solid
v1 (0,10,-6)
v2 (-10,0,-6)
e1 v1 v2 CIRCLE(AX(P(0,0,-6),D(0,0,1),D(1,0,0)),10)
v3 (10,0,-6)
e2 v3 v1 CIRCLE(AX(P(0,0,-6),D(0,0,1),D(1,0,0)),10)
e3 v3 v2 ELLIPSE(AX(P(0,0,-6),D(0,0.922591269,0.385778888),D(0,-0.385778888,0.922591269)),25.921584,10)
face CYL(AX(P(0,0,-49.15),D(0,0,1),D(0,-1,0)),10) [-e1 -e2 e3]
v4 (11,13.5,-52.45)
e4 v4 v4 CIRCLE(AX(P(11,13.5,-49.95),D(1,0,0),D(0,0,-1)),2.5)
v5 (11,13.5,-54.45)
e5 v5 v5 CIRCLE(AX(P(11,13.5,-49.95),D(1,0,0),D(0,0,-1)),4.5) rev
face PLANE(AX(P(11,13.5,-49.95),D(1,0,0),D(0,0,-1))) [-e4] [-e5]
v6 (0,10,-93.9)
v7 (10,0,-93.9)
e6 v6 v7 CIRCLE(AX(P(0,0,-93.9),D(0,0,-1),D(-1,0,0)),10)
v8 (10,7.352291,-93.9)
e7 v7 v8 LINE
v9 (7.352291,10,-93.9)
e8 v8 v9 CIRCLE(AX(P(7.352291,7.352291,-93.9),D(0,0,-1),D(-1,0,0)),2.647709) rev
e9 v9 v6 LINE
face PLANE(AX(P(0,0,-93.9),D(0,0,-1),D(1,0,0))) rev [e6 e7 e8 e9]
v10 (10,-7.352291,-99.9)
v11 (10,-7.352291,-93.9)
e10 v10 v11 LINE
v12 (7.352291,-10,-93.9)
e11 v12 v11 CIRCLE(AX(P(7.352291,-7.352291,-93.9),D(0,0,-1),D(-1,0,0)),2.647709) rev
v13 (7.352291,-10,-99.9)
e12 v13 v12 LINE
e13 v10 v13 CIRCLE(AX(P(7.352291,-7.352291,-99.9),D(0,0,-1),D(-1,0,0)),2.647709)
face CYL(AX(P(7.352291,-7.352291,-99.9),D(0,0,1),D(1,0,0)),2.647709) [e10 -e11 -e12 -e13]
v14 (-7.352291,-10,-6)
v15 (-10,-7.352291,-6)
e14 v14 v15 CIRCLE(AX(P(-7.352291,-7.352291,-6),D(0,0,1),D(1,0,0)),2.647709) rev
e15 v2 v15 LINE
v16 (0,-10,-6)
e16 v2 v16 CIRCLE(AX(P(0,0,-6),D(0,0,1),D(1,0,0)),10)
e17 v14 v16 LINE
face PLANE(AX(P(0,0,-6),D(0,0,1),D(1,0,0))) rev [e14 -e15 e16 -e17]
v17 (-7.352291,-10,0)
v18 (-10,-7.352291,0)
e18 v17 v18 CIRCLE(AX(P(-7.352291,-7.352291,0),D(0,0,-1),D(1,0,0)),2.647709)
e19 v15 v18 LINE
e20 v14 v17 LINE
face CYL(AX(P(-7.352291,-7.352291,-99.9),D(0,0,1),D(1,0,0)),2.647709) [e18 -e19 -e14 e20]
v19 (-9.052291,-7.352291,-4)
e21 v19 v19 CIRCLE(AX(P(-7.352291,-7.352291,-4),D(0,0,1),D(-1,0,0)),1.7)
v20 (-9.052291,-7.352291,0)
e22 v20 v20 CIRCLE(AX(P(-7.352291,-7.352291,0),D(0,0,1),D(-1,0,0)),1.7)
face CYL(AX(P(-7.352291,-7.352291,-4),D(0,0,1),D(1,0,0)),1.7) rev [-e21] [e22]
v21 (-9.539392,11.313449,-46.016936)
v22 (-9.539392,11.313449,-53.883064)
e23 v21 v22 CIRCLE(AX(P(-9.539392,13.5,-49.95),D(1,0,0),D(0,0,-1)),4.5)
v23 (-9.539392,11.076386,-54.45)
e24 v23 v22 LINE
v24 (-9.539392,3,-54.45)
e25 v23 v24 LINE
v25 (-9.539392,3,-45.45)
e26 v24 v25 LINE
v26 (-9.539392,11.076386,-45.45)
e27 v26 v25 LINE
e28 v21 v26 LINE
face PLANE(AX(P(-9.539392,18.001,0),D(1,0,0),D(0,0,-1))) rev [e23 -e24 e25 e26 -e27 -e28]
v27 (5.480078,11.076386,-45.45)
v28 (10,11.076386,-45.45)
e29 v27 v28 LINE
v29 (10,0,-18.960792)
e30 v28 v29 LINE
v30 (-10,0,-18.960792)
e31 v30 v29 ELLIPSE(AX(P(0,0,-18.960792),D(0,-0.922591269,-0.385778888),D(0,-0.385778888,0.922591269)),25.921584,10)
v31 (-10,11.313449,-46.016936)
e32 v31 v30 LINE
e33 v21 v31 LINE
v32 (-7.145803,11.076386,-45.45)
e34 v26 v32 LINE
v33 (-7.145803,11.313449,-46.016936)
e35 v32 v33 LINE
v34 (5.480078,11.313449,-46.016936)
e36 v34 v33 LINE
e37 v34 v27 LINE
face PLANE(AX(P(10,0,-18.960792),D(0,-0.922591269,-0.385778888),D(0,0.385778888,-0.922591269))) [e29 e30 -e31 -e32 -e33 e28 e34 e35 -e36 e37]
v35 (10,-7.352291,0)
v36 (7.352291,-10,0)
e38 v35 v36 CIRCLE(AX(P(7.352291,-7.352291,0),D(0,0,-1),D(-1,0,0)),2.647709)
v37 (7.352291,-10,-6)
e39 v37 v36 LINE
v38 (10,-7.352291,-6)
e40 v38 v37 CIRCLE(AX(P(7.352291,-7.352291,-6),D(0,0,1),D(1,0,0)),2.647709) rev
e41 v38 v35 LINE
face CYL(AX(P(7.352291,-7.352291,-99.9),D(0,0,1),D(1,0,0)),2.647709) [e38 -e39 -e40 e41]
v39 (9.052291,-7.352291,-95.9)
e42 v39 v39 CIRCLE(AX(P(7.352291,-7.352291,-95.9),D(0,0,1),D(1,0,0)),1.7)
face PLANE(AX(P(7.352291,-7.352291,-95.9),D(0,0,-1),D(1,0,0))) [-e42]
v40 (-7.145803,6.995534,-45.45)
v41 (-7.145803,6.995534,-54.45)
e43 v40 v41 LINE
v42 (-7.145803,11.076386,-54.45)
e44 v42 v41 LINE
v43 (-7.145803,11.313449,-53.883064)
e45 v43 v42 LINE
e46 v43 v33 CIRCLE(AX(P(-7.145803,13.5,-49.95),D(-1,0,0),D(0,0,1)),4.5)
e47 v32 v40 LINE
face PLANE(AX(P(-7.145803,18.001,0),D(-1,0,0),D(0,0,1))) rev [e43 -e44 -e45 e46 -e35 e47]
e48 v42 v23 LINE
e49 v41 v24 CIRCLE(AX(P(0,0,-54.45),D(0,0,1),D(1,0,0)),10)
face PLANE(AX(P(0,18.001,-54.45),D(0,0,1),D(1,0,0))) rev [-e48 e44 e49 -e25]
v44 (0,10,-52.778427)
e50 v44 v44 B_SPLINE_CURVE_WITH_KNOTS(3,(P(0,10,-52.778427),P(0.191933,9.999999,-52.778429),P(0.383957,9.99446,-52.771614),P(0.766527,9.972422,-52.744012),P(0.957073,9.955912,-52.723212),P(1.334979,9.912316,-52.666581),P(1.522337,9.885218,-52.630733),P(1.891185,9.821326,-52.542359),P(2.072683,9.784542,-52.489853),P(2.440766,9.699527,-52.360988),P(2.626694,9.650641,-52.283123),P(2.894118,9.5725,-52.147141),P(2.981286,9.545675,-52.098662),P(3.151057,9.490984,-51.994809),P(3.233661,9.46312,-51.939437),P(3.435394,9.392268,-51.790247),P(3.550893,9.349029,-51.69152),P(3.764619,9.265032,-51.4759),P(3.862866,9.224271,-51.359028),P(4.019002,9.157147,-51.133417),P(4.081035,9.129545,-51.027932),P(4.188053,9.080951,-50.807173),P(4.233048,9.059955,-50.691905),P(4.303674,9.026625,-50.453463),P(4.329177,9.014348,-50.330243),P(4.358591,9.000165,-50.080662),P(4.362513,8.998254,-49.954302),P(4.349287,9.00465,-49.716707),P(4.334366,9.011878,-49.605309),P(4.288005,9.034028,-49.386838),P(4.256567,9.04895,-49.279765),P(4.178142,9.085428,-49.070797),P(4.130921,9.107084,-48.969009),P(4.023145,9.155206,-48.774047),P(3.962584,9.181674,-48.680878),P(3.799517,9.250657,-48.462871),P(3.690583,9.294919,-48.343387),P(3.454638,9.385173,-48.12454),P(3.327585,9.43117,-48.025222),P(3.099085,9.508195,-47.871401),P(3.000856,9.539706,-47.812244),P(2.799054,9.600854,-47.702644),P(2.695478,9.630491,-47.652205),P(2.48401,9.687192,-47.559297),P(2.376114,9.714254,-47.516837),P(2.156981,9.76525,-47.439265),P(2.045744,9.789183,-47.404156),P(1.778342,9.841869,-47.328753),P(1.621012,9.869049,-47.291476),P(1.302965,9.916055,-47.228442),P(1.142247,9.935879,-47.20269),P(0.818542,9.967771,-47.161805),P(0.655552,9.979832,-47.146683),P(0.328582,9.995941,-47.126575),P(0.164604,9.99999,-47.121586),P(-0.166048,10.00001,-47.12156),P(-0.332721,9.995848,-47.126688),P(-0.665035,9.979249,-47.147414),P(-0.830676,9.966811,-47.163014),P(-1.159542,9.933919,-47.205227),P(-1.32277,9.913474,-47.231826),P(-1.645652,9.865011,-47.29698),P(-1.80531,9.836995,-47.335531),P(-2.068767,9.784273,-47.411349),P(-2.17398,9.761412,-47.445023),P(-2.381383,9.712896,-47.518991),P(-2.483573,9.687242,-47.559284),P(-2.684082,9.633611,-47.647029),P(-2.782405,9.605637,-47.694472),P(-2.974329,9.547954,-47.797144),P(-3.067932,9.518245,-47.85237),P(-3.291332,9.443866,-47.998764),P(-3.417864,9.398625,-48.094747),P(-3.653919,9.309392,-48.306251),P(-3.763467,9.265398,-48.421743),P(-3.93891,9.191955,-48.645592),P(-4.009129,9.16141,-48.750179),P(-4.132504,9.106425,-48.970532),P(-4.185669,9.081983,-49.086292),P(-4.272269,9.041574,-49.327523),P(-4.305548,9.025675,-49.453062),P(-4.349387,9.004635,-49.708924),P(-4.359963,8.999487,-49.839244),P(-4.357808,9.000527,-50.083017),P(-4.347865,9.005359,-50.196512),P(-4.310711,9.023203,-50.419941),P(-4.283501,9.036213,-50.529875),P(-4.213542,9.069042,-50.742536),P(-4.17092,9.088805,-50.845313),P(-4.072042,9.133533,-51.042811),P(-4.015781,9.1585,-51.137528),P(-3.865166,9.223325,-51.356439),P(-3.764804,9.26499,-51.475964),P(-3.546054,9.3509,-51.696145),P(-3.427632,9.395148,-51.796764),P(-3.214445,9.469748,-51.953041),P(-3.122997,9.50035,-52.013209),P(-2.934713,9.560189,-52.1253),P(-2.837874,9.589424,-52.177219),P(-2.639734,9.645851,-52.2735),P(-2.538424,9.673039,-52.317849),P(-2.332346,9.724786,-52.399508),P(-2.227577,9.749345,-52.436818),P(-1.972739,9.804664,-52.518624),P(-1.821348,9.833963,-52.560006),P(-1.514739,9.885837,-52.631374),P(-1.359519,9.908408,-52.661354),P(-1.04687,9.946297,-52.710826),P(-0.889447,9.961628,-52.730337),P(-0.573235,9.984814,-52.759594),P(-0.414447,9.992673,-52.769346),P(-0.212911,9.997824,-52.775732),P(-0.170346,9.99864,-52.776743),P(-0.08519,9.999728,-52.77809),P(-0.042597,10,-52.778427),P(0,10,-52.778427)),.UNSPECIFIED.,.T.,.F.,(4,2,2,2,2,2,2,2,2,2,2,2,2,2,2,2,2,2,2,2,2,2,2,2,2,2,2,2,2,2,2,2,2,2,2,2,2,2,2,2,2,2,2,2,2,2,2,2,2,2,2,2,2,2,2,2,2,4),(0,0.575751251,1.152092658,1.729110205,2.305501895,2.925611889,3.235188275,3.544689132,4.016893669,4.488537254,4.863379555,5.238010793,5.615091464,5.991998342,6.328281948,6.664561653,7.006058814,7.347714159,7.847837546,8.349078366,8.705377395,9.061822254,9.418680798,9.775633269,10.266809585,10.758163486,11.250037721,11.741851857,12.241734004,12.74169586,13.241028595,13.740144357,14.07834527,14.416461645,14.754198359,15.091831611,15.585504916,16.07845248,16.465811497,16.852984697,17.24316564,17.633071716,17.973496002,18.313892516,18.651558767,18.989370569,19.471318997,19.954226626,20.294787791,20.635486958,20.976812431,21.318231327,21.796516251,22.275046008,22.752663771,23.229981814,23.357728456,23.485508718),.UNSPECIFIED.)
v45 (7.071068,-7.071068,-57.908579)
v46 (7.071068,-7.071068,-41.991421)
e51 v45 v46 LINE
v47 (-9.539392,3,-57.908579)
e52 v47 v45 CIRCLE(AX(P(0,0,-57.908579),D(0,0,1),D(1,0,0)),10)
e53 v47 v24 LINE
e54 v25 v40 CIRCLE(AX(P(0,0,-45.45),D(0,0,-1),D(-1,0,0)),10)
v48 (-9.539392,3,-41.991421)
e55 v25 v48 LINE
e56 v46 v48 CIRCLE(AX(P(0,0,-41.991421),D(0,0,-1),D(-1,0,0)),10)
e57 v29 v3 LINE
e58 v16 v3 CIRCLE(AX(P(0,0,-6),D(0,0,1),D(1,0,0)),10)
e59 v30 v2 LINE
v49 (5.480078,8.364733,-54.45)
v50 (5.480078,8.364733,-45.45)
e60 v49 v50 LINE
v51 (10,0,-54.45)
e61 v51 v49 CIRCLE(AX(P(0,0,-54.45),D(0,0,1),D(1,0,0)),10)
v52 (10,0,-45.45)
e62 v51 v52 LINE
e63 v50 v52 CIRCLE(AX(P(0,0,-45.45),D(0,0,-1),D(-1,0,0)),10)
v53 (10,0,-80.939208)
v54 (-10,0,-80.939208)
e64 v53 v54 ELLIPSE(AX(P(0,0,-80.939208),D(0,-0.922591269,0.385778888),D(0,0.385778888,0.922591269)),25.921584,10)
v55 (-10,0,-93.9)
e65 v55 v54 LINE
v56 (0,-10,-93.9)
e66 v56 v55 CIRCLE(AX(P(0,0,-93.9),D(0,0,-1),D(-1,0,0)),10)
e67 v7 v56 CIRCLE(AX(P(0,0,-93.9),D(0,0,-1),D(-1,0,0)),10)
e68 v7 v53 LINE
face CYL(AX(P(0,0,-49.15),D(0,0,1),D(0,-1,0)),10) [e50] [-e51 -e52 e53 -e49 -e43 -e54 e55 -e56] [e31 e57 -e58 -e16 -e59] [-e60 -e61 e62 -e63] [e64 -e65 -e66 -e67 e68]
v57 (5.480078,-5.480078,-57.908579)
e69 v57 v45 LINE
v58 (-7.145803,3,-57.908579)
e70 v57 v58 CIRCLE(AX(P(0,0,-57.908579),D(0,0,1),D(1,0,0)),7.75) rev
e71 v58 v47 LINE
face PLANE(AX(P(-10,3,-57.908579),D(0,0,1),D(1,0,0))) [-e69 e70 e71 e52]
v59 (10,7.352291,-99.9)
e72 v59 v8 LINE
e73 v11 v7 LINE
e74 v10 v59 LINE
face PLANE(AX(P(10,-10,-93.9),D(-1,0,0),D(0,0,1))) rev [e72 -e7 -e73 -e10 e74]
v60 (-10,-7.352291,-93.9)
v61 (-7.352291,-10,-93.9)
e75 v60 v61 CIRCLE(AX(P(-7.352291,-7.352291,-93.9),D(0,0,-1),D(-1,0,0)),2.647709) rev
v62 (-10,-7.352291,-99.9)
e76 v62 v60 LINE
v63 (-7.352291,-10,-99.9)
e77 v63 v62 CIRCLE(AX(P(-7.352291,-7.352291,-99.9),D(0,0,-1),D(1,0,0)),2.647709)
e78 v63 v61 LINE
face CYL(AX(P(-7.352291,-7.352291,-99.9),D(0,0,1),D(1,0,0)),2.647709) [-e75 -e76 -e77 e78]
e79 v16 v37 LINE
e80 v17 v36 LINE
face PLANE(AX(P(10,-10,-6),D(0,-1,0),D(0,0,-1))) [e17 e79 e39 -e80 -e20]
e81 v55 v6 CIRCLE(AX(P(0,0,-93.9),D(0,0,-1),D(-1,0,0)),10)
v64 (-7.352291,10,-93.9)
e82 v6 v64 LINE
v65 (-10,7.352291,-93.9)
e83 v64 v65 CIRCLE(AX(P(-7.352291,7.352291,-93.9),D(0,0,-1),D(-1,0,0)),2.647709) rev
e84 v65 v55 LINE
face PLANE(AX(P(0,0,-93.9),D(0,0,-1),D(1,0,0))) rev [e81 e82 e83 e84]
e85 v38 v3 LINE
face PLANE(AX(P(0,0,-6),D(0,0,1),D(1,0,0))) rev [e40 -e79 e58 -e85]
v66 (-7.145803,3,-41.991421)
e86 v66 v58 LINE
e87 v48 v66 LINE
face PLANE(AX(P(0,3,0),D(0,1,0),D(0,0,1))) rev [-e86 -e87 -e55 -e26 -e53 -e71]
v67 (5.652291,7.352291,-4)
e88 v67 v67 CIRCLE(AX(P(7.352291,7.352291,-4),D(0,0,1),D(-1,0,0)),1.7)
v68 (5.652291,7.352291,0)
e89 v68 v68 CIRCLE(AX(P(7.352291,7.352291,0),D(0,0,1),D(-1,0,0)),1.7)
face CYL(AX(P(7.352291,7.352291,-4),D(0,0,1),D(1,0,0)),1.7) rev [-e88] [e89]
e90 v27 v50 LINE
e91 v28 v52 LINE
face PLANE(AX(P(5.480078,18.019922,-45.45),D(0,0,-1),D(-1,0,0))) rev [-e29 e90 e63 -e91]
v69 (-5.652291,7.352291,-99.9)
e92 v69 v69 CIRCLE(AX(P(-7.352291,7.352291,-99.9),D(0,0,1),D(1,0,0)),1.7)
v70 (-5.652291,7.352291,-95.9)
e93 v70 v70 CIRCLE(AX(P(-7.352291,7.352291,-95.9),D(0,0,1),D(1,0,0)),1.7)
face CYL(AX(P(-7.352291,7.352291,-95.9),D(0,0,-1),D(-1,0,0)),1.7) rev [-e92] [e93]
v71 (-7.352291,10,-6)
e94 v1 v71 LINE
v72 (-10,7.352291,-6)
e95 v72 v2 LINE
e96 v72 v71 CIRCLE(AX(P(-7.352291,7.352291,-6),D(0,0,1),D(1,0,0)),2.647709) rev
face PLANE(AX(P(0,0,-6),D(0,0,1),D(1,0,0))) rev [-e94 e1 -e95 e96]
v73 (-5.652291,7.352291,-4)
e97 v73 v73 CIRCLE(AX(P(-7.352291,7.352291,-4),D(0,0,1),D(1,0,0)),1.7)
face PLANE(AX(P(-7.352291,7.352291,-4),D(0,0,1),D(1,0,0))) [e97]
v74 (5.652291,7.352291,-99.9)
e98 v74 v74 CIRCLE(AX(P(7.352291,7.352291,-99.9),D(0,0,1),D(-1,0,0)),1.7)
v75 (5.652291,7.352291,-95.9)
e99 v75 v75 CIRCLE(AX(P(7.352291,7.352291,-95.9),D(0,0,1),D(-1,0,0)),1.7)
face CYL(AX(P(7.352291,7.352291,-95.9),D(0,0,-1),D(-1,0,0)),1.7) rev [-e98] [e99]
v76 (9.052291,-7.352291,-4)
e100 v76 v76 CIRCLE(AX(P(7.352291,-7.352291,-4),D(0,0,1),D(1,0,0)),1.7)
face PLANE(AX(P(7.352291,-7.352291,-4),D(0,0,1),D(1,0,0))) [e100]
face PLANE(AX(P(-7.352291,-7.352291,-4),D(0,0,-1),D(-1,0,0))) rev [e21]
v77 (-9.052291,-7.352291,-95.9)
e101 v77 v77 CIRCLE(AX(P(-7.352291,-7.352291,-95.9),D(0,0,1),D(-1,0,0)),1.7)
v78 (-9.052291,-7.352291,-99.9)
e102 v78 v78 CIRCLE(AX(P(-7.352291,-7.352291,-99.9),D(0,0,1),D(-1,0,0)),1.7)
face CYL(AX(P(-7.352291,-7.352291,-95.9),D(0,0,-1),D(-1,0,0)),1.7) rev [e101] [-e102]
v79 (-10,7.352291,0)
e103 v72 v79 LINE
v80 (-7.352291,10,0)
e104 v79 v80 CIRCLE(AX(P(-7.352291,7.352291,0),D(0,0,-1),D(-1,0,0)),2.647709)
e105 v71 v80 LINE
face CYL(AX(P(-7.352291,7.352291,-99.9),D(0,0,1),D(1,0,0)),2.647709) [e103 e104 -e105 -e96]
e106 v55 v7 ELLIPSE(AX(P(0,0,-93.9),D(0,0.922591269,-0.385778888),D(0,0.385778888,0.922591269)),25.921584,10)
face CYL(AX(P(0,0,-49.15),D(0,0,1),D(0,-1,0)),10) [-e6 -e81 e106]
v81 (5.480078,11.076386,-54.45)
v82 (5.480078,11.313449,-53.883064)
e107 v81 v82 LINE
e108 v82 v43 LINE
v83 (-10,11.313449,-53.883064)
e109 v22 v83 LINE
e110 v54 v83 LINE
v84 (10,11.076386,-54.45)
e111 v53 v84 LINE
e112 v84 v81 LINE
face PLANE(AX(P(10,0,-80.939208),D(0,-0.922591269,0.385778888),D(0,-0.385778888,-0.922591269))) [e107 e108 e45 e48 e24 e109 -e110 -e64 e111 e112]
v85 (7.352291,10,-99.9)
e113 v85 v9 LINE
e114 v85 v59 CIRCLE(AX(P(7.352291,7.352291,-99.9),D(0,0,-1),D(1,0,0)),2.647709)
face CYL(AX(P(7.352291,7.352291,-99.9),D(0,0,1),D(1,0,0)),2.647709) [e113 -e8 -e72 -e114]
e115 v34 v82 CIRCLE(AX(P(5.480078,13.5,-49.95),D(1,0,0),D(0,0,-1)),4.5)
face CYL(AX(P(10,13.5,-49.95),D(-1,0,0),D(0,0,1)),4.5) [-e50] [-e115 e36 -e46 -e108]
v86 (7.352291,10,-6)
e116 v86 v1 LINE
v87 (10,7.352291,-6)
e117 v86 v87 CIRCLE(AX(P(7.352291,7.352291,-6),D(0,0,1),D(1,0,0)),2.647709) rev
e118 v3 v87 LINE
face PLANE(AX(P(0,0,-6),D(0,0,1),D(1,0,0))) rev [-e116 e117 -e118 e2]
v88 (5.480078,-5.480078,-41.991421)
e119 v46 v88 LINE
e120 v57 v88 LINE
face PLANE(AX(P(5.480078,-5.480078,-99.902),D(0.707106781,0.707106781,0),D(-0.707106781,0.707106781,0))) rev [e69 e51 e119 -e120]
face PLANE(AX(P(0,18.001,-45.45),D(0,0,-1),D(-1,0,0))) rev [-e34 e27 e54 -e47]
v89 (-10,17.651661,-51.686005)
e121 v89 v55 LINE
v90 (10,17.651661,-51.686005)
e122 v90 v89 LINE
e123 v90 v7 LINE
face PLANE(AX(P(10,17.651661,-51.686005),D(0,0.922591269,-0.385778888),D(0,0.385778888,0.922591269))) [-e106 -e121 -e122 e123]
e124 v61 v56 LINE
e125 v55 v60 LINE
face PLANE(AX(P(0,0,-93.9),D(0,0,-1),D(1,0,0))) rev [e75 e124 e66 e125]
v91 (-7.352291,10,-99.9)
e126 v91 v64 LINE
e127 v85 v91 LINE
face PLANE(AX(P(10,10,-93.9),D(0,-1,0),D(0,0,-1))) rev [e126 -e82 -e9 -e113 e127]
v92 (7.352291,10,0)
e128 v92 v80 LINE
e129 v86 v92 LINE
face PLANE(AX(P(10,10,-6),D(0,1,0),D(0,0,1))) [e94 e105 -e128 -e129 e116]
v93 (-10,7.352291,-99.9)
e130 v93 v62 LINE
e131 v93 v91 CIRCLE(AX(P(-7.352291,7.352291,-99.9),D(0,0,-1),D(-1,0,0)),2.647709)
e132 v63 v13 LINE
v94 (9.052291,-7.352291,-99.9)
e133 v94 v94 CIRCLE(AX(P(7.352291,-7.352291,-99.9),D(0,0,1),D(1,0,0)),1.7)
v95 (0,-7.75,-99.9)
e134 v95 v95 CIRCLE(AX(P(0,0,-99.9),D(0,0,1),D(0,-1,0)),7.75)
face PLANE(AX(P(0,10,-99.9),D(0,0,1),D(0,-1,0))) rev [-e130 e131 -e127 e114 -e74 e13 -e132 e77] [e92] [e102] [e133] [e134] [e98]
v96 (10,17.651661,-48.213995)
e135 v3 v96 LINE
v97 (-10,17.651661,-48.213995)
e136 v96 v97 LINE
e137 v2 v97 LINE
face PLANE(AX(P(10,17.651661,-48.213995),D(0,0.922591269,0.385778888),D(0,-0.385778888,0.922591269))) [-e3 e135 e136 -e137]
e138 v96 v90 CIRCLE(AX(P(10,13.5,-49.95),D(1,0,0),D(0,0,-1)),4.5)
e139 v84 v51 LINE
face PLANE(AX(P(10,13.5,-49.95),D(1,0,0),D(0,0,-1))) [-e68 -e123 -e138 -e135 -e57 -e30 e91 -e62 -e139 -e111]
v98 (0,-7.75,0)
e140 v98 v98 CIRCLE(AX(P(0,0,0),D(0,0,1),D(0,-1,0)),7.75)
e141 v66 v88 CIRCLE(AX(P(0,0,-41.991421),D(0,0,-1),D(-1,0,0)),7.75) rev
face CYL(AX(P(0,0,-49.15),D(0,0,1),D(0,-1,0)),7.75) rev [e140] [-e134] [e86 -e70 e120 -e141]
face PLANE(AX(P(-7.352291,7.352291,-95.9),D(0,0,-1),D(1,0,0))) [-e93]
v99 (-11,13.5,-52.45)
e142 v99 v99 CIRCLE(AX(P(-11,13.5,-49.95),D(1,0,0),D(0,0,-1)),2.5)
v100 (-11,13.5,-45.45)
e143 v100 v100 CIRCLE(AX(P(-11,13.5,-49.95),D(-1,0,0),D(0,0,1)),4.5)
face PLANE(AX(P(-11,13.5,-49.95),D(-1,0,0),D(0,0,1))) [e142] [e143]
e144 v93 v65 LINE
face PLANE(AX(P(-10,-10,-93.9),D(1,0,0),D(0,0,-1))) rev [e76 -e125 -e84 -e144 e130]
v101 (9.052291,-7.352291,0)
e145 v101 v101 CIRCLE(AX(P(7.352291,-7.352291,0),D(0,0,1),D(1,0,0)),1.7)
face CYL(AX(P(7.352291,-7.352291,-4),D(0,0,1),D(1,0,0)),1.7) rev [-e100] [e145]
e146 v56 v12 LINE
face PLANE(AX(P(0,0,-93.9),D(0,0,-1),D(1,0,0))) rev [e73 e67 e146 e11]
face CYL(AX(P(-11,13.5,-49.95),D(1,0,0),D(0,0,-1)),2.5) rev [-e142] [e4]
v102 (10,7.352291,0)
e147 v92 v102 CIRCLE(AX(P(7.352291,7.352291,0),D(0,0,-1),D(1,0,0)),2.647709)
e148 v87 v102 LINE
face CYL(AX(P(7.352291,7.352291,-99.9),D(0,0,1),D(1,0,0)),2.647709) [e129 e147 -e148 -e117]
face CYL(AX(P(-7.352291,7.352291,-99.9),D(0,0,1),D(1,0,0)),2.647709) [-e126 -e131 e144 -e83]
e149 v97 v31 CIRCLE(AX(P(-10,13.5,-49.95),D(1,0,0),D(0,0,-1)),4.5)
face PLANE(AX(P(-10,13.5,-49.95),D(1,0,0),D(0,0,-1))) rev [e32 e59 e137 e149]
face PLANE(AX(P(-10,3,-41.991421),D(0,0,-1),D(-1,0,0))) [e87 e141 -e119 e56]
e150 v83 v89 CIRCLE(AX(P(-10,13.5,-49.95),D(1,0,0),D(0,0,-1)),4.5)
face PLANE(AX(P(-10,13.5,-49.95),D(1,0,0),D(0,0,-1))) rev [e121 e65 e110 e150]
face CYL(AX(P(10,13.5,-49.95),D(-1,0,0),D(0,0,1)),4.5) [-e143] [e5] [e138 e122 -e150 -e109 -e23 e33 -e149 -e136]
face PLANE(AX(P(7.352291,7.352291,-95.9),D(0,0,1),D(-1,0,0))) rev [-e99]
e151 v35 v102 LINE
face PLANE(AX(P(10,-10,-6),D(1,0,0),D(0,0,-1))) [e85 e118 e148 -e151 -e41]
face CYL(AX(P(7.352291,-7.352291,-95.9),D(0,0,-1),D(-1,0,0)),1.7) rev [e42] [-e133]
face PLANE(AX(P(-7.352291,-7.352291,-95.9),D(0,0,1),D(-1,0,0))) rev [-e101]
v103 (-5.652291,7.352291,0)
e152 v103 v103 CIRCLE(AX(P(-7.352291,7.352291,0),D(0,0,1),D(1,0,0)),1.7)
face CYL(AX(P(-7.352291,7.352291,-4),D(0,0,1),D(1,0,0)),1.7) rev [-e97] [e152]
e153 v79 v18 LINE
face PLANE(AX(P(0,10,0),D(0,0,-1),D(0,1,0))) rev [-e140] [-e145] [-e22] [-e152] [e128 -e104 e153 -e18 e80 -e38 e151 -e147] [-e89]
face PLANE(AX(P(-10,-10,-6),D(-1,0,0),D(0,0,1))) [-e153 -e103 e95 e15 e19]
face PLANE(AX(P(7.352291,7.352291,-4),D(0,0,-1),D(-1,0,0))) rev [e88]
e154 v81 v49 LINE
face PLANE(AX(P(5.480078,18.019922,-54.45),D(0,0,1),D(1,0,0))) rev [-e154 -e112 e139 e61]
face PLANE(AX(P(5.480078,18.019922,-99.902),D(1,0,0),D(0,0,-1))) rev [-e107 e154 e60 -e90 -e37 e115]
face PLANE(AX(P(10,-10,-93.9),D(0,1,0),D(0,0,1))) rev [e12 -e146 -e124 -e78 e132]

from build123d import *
from build123d.topology import SkipClean

# Parameters (mm, degrees)
SKIZZE2_W                            = 99.9
SKIZZE2_H                            = 2.25
SKIZZE3_W                            = 20
SKIZZE3_H                            = 20
SKIZZE3_R                            = 7.75
AUFSATZ_LINEAR_AUSTRAGEN1_DEPTH      = 6
SKIZZE5_R                            = 1.7
SCHNITT_LINEAR_AUSTRAGEN1_DEPTH      = 4
SCHNITT_LINEAR_AUSTRAGEN2_DEPTH      = 101.896035601
SCHNITT_LINEAR_AUSTRAGEN4_DEPTH      = 3
SCHNITT_LINEAR_AUSTRAGEN4_DEPTH_BACK = 101.896035601
SKIZZE8_W                            = 20
SKIZZE8_H                            = 15.917157288
AUFSATZ_LINEAR_AUSTRAGEN2_REACH      = 61.61
AUFSATZ_LINEAR_AUSTRAGEN11_DEPTH     = 20
SKIZZE20_R                           = 7.75
SCHNITT_LINEAR_AUSTRAGEN7_DEPTH      = 103.000049029
AUFSATZ_LINEAR_START                 = -21
SKIZZE21_R                           = 4.5
AUFSATZ_LINEAR_AUSTRAGEN12_DEPTH     = 22
SKIZZE22_R                           = 2.5
SCHNITT_LINEAR_AUSTRAGEN8_DEPTH      = 104.86534552
AUFSATZ_LINEAR_START_2               = -9.539392014
AUFSATZ_LINEAR_AUSTRAGEN14_DEPTH     = 2.39358905
AUFSATZ_LINEAR_START_3               = -20.918031139
AUFSATZ_LINEAR_AUSTRAGEN15_OUTLINE_W = 4.519922446
AUFSATZ_LINEAR_AUSTRAGEN15_OUTLINE_H = 9
AUFSATZ_LINEAR_AUSTRAGEN15_DEPTH     = 16.398108693
AUFSATZ_LINEAR_START_4               = 5.480077554
AUFSATZ_LINEAR_AUSTRAGEN15_2_DEPTH   = 4.519922446
AUFSATZ_LINEAR_START_5               = -54.45
AUFSATZ_LINEAR_AUSTRAGEN15_3_DEPTH   = 9
SKIZZE26_R                           = 7.75
SCHNITT_LINEAR_AUSTRAGEN9_DEPTH      = 9


with BuildPart() as part:
    # Skizze2 → Rotation1 (revolve)
    with BuildSketch(Plane(origin=(0, 0, 0), x_dir=(0, 0, -1), z_dir=(1, 0, 0)), mode=Mode.PRIVATE) as rotation1_sk:
        with Locations((49.95, 8.875)):
            Rectangle(SKIZZE2_W, SKIZZE2_H)
    revolve(rotation1_sk.sketch.rotate(Axis((0, 0, -49.15), (0, 0, -1)), 180), axis=Axis((0, 0, -49.15), (0, 0, -1)))

    # Skizze3 → Aufsatz-Linear austragen1 (add)
    with BuildSketch(Plane.XY):
        Rectangle(SKIZZE3_W, SKIZZE3_H)
        with Locations(Location((0, 0, 0), (0, 0, 270))):
            Circle(SKIZZE3_R, mode=Mode.SUBTRACT)
    aufsatz_linear_austragen1 = extrude(amount=-AUFSATZ_LINEAR_AUSTRAGEN1_DEPTH)

    # Skizze5 → Schnitt-Linear austragen1 (cut)
    with BuildSketch(Plane.XY):
        with Locations((-7.352290732, 7.352290732)):
            Circle(SKIZZE5_R)
        with Locations(Location((-7.352290732, -7.352290732, 0), (0, 0, 180))):
            Circle(SKIZZE5_R)
        with Locations((7.352290732, -7.352290732)):
            Circle(SKIZZE5_R)
        with Locations(Location((7.352290732, 7.352290732, 0), (0, 0, 180))):
            Circle(SKIZZE5_R)
    schnitt_linear_austragen1 = extrude(amount=-SCHNITT_LINEAR_AUSTRAGEN1_DEPTH, mode=Mode.SUBTRACT)

    # Spiegeln1: Aufsatz-Linear austragen1, Schnitt-Linear austragen1 across plane
    add(aufsatz_linear_austragen1.mirror(Plane.XY.offset(-49.95)))
    add(schnitt_linear_austragen1.mirror(Plane.XY.offset(-49.95)), mode=Mode.SUBTRACT)

    # Skizze6 → Schnitt-Linear austragen2 (cut, through all)
    with BuildSketch(Plane.XY):
        with BuildLine():
            Line((-10, 7.352290732), (-10.707106781, 7.352290732))
            Line((-10.707106781, 7.352290732), (-10.707106781, 10.707106781))
            Line((-10.707106781, 10.707106781), (-7.352290732, 10.707106781))
            Line((-7.352290732, 10.707106781), (-7.352290732, 10))
            ThreePointArc((-7.352290732, 10), (-9.22450391, 9.22450391), (-10, 7.352290732))
        make_face()
        with BuildLine():
            Line((7.352290732, 10.707106781), (7.352290732, 10))
            ThreePointArc((7.352290732, 10), (9.22450391, 9.22450391), (10, 7.352290732))
            Line((10, 7.352290732), (10.707106781, 7.352290732))
            Line((10.707106781, 7.352290732), (10.707106781, 10.707106781))
            Line((10.707106781, 10.707106781), (7.352290732, 10.707106781))
        make_face()
        with BuildLine():
            Line((10, -7.352290732), (10.707106781, -7.352290732))
            Line((10.707106781, -7.352290732), (10.707106781, -10.707106781))
            Line((10.707106781, -10.707106781), (7.352290732, -10.707106781))
            Line((7.352290732, -10.707106781), (7.352290732, -10))
            ThreePointArc((7.352290732, -10), (9.22450391, -9.22450391), (10, -7.352290732))
        make_face()
        with BuildLine():
            Line((-7.352290732, -10.707106781), (-7.352290732, -10))
            ThreePointArc((-7.352290732, -10), (-9.22450391, -9.22450391), (-10, -7.352290732))
            Line((-10, -7.352290732), (-10.707106781, -7.352290732))
            Line((-10.707106781, -7.352290732), (-10.707106781, -10.707106781))
            Line((-10.707106781, -10.707106781), (-7.352290732, -10.707106781))
        make_face()
    extrude(amount=-SCHNITT_LINEAR_AUSTRAGEN2_DEPTH, mode=Mode.SUBTRACT)

    # Skizze8 → Schnitt-Linear austragen4 (cut, two sides: drawn at the far end of the back side and taken through both)
    with BuildSketch(Plane(origin=(0, 0, 0), x_dir=(1, 0, 0), z_dir=(0, 1, 0)).offset(-SCHNITT_LINEAR_AUSTRAGEN4_DEPTH_BACK)):
        with Locations((0, 49.95)):
            Rectangle(SKIZZE8_W, SKIZZE8_H)
    extrude(amount=SCHNITT_LINEAR_AUSTRAGEN4_DEPTH + SCHNITT_LINEAR_AUSTRAGEN4_DEPTH_BACK, mode=Mode.SUBTRACT)

    # Skizze9 → Aufsatz-Linear austragen2 (add, up to next)
    with BuildSketch(Plane(origin=(0, 0, -41.991421356), x_dir=(-1, 0, 0), z_dir=(0, 0, -1)), mode=Mode.PRIVATE) as aufsatz_linear_austragen2_sk1:
        with BuildLine():
            Line((-9.539392014, 3), (-7.145802964, 3))
            ThreePointArc((-7.145802964, 3), (-7.604679056, -1.493772558), (-5.480077554, -5.480077554))
            Line((-5.480077554, -5.480077554), (-7.071067812, -7.071067812))
            ThreePointArc((-7.071067812, -7.071067812), (-9.712540637, -2.380452557), (-9.539392014, 3))
        make_face()
    aufsatz_linear_austragen2_tool1 = extrude(aufsatz_linear_austragen2_sk1.sketch, amount=AUFSATZ_LINEAR_AUSTRAGEN2_REACH, mode=Mode.PRIVATE) - part.part
    add(aufsatz_linear_austragen2_tool1.solids().sort_by_distance((8.235697, -1.849559, -41.991421))[0])

    # Skizze19 → Aufsatz-Linear austragen11 (add, through all)
    with BuildSketch(Plane.ZY.offset(10)):
        with BuildLine():
            Line((-51.686004996, 17.65166071), (-93.9, 0))
            Line((-93.9, 0), (-80.939207809, 0))
            Line((-80.939207809, 0), (-53.883064142, 11.31344873))
            ThreePointArc((-53.883064142, 11.31344873), (-49.95, 9), (-46.016935858, 11.31344873))
            Line((-46.016935858, 11.31344873), (-18.960792191, 0))
            Line((-18.960792191, 0), (-6, 0))
            Line((-6, 0), (-48.213995004, 17.65166071))
            ThreePointArc((-48.213995004, 17.65166071), (-49.95, 18), (-51.686004996, 17.65166071))
        make_face()
    extrude(amount=-AUFSATZ_LINEAR_AUSTRAGEN11_DEPTH)

    # Skizze20 → Schnitt-Linear austragen7 (cut, through all)
    with SkipClean():  # the faces are left unmerged after this step: merging them gives an invalid solid
        with BuildSketch(Plane(origin=(0, 0, -99.9), x_dir=(-1, 0, 0), z_dir=(0, 0, -1))):
            with Locations(Location((0, 0, 0), (0, 0, 270))):
                Circle(SKIZZE20_R)
        extrude(amount=-SCHNITT_LINEAR_AUSTRAGEN7_DEPTH, mode=Mode.SUBTRACT)

    # Skizze21 → Aufsatz-Linear austragen12 (add)
    with SkipClean():  # the faces are left unmerged after this step: merging them gives an invalid solid
        with BuildSketch(Plane.ZY.offset(10).offset(AUFSATZ_LINEAR_START)):
            with Locations((-49.95, 13.5)):
                Circle(SKIZZE21_R)
        extrude(amount=AUFSATZ_LINEAR_AUSTRAGEN12_DEPTH)

    # Skizze22 → Schnitt-Linear austragen8 (cut, through all)
    with SkipClean():  # the faces are left unmerged after this step: merging them gives an invalid solid
        with BuildSketch(Plane(origin=(11, 0, 0), x_dir=(0, 0, -1), z_dir=(1, 0, 0))):
            with Locations((49.95, 13.5)):
                Circle(SKIZZE22_R)
        extrude(amount=-SCHNITT_LINEAR_AUSTRAGEN8_DEPTH, mode=Mode.SUBTRACT)

    # Aufsatz-Linear austragen14: read off the stored shape, not the designer's step
    # Aufsatz-Linear austragen14 outline → Aufsatz-Linear austragen14 (add)
    with SkipClean():  # the faces are left unmerged after this step: merging them gives an invalid solid
        with BuildSketch(Plane.YZ.offset(AUFSATZ_LINEAR_START_2)):
            with BuildLine():
                Line((11.31344873, -46.016935858), (11.076386129, -45.45))
                Line((11.076386129, -45.45), (3, -45.45))
                Line((3, -45.45), (3, -54.45))
                Line((3, -54.45), (11.076386129, -54.45))
                Line((11.076386129, -54.45), (11.31344873, -53.883064142))
                ThreePointArc((11.31344873, -53.883064142), (9, -49.95), (11.31344873, -46.016935858))
            make_face()
        extrude(amount=AUFSATZ_LINEAR_AUSTRAGEN14_DEPTH)

    # Aufsatz-Linear austragen15: read off the stored shape, not the designer's step
    # Aufsatz-Linear austragen15 outline → Aufsatz-Linear austragen15 (add)
    with SkipClean():  # the faces are left unmerged after this step: merging them gives an invalid solid
        with BuildSketch(Plane(origin=(0, -10, 0), x_dir=(-1, 0, 0), z_dir=(0, -1, 0)).offset(AUFSATZ_LINEAR_START_3)):
            with Locations((-7.740038777, 49.95)):
                Rectangle(AUFSATZ_LINEAR_AUSTRAGEN15_OUTLINE_W, AUFSATZ_LINEAR_AUSTRAGEN15_OUTLINE_H)
        extrude(amount=AUFSATZ_LINEAR_AUSTRAGEN15_DEPTH)

    # Aufsatz-Linear austragen15 2 outline → Aufsatz-Linear austragen15 2 (add)
    with SkipClean():  # the faces are left unmerged after this step: merging them gives an invalid solid
        with BuildSketch(Plane.YZ.offset(AUFSATZ_LINEAR_START_4)):
            with BuildLine():
                Line((11.076386129, -45.45), (10.918031139, -45.45))
                Line((10.918031139, -45.45), (10.918031139, -46.264428565))
                ThreePointArc((10.918031139, -46.264428565), (11.112530792, -46.135554984), (11.31344873, -46.016935858))
                Line((11.31344873, -46.016935858), (11.076386129, -45.45))
            make_face()
            with BuildLine():
                Line((10.918031139, -53.635571435), (10.918031139, -54.45))
                Line((10.918031139, -54.45), (11.076386129, -54.45))
                Line((11.076386129, -54.45), (11.31344873, -53.883064142))
                ThreePointArc((11.31344873, -53.883064142), (11.112530792, -53.764445016), (10.918031139, -53.635571435))
            make_face()
        extrude(amount=AUFSATZ_LINEAR_AUSTRAGEN15_2_DEPTH)

    # Aufsatz-Linear austragen15 3 outline → Aufsatz-Linear austragen15 3 (add)
    with SkipClean():  # the faces are left unmerged after this step: merging them gives an invalid solid
        with BuildSketch(Plane.XY.offset(AUFSATZ_LINEAR_START_5)):
            with BuildLine():
                Line((7.071067812, -7.071067812), (10, -10))
                Line((10, -10), (10, -5.480077554))
                Line((10, -5.480077554), (8.364732512, -5.480077554))
                ThreePointArc((8.364732512, -5.480077554), (7.75878827, -6.308819588), (7.071067812, -7.071067812))
            make_face()
        extrude(amount=AUFSATZ_LINEAR_AUSTRAGEN15_3_DEPTH)

    # Skizze26 → Schnitt-Linear austragen9 (cut)
    with BuildSketch(Plane.XY.offset(-45.45)):
        with Locations(Location((0, 0, 0), (0, 0, 270))):
            Circle(SKIZZE26_R)
        with BuildLine():
            Line((7.071067812, -7.071067812), (10, -10))
            Line((10, -10), (10, 0))
            ThreePointArc((10, 0), (9.238795325, -3.826834324), (7.071067812, -7.071067812))
        make_face()
    extrude(amount=-SCHNITT_LINEAR_AUSTRAGEN9_DEPTH, mode=Mode.SUBTRACT)


solid = part.part
